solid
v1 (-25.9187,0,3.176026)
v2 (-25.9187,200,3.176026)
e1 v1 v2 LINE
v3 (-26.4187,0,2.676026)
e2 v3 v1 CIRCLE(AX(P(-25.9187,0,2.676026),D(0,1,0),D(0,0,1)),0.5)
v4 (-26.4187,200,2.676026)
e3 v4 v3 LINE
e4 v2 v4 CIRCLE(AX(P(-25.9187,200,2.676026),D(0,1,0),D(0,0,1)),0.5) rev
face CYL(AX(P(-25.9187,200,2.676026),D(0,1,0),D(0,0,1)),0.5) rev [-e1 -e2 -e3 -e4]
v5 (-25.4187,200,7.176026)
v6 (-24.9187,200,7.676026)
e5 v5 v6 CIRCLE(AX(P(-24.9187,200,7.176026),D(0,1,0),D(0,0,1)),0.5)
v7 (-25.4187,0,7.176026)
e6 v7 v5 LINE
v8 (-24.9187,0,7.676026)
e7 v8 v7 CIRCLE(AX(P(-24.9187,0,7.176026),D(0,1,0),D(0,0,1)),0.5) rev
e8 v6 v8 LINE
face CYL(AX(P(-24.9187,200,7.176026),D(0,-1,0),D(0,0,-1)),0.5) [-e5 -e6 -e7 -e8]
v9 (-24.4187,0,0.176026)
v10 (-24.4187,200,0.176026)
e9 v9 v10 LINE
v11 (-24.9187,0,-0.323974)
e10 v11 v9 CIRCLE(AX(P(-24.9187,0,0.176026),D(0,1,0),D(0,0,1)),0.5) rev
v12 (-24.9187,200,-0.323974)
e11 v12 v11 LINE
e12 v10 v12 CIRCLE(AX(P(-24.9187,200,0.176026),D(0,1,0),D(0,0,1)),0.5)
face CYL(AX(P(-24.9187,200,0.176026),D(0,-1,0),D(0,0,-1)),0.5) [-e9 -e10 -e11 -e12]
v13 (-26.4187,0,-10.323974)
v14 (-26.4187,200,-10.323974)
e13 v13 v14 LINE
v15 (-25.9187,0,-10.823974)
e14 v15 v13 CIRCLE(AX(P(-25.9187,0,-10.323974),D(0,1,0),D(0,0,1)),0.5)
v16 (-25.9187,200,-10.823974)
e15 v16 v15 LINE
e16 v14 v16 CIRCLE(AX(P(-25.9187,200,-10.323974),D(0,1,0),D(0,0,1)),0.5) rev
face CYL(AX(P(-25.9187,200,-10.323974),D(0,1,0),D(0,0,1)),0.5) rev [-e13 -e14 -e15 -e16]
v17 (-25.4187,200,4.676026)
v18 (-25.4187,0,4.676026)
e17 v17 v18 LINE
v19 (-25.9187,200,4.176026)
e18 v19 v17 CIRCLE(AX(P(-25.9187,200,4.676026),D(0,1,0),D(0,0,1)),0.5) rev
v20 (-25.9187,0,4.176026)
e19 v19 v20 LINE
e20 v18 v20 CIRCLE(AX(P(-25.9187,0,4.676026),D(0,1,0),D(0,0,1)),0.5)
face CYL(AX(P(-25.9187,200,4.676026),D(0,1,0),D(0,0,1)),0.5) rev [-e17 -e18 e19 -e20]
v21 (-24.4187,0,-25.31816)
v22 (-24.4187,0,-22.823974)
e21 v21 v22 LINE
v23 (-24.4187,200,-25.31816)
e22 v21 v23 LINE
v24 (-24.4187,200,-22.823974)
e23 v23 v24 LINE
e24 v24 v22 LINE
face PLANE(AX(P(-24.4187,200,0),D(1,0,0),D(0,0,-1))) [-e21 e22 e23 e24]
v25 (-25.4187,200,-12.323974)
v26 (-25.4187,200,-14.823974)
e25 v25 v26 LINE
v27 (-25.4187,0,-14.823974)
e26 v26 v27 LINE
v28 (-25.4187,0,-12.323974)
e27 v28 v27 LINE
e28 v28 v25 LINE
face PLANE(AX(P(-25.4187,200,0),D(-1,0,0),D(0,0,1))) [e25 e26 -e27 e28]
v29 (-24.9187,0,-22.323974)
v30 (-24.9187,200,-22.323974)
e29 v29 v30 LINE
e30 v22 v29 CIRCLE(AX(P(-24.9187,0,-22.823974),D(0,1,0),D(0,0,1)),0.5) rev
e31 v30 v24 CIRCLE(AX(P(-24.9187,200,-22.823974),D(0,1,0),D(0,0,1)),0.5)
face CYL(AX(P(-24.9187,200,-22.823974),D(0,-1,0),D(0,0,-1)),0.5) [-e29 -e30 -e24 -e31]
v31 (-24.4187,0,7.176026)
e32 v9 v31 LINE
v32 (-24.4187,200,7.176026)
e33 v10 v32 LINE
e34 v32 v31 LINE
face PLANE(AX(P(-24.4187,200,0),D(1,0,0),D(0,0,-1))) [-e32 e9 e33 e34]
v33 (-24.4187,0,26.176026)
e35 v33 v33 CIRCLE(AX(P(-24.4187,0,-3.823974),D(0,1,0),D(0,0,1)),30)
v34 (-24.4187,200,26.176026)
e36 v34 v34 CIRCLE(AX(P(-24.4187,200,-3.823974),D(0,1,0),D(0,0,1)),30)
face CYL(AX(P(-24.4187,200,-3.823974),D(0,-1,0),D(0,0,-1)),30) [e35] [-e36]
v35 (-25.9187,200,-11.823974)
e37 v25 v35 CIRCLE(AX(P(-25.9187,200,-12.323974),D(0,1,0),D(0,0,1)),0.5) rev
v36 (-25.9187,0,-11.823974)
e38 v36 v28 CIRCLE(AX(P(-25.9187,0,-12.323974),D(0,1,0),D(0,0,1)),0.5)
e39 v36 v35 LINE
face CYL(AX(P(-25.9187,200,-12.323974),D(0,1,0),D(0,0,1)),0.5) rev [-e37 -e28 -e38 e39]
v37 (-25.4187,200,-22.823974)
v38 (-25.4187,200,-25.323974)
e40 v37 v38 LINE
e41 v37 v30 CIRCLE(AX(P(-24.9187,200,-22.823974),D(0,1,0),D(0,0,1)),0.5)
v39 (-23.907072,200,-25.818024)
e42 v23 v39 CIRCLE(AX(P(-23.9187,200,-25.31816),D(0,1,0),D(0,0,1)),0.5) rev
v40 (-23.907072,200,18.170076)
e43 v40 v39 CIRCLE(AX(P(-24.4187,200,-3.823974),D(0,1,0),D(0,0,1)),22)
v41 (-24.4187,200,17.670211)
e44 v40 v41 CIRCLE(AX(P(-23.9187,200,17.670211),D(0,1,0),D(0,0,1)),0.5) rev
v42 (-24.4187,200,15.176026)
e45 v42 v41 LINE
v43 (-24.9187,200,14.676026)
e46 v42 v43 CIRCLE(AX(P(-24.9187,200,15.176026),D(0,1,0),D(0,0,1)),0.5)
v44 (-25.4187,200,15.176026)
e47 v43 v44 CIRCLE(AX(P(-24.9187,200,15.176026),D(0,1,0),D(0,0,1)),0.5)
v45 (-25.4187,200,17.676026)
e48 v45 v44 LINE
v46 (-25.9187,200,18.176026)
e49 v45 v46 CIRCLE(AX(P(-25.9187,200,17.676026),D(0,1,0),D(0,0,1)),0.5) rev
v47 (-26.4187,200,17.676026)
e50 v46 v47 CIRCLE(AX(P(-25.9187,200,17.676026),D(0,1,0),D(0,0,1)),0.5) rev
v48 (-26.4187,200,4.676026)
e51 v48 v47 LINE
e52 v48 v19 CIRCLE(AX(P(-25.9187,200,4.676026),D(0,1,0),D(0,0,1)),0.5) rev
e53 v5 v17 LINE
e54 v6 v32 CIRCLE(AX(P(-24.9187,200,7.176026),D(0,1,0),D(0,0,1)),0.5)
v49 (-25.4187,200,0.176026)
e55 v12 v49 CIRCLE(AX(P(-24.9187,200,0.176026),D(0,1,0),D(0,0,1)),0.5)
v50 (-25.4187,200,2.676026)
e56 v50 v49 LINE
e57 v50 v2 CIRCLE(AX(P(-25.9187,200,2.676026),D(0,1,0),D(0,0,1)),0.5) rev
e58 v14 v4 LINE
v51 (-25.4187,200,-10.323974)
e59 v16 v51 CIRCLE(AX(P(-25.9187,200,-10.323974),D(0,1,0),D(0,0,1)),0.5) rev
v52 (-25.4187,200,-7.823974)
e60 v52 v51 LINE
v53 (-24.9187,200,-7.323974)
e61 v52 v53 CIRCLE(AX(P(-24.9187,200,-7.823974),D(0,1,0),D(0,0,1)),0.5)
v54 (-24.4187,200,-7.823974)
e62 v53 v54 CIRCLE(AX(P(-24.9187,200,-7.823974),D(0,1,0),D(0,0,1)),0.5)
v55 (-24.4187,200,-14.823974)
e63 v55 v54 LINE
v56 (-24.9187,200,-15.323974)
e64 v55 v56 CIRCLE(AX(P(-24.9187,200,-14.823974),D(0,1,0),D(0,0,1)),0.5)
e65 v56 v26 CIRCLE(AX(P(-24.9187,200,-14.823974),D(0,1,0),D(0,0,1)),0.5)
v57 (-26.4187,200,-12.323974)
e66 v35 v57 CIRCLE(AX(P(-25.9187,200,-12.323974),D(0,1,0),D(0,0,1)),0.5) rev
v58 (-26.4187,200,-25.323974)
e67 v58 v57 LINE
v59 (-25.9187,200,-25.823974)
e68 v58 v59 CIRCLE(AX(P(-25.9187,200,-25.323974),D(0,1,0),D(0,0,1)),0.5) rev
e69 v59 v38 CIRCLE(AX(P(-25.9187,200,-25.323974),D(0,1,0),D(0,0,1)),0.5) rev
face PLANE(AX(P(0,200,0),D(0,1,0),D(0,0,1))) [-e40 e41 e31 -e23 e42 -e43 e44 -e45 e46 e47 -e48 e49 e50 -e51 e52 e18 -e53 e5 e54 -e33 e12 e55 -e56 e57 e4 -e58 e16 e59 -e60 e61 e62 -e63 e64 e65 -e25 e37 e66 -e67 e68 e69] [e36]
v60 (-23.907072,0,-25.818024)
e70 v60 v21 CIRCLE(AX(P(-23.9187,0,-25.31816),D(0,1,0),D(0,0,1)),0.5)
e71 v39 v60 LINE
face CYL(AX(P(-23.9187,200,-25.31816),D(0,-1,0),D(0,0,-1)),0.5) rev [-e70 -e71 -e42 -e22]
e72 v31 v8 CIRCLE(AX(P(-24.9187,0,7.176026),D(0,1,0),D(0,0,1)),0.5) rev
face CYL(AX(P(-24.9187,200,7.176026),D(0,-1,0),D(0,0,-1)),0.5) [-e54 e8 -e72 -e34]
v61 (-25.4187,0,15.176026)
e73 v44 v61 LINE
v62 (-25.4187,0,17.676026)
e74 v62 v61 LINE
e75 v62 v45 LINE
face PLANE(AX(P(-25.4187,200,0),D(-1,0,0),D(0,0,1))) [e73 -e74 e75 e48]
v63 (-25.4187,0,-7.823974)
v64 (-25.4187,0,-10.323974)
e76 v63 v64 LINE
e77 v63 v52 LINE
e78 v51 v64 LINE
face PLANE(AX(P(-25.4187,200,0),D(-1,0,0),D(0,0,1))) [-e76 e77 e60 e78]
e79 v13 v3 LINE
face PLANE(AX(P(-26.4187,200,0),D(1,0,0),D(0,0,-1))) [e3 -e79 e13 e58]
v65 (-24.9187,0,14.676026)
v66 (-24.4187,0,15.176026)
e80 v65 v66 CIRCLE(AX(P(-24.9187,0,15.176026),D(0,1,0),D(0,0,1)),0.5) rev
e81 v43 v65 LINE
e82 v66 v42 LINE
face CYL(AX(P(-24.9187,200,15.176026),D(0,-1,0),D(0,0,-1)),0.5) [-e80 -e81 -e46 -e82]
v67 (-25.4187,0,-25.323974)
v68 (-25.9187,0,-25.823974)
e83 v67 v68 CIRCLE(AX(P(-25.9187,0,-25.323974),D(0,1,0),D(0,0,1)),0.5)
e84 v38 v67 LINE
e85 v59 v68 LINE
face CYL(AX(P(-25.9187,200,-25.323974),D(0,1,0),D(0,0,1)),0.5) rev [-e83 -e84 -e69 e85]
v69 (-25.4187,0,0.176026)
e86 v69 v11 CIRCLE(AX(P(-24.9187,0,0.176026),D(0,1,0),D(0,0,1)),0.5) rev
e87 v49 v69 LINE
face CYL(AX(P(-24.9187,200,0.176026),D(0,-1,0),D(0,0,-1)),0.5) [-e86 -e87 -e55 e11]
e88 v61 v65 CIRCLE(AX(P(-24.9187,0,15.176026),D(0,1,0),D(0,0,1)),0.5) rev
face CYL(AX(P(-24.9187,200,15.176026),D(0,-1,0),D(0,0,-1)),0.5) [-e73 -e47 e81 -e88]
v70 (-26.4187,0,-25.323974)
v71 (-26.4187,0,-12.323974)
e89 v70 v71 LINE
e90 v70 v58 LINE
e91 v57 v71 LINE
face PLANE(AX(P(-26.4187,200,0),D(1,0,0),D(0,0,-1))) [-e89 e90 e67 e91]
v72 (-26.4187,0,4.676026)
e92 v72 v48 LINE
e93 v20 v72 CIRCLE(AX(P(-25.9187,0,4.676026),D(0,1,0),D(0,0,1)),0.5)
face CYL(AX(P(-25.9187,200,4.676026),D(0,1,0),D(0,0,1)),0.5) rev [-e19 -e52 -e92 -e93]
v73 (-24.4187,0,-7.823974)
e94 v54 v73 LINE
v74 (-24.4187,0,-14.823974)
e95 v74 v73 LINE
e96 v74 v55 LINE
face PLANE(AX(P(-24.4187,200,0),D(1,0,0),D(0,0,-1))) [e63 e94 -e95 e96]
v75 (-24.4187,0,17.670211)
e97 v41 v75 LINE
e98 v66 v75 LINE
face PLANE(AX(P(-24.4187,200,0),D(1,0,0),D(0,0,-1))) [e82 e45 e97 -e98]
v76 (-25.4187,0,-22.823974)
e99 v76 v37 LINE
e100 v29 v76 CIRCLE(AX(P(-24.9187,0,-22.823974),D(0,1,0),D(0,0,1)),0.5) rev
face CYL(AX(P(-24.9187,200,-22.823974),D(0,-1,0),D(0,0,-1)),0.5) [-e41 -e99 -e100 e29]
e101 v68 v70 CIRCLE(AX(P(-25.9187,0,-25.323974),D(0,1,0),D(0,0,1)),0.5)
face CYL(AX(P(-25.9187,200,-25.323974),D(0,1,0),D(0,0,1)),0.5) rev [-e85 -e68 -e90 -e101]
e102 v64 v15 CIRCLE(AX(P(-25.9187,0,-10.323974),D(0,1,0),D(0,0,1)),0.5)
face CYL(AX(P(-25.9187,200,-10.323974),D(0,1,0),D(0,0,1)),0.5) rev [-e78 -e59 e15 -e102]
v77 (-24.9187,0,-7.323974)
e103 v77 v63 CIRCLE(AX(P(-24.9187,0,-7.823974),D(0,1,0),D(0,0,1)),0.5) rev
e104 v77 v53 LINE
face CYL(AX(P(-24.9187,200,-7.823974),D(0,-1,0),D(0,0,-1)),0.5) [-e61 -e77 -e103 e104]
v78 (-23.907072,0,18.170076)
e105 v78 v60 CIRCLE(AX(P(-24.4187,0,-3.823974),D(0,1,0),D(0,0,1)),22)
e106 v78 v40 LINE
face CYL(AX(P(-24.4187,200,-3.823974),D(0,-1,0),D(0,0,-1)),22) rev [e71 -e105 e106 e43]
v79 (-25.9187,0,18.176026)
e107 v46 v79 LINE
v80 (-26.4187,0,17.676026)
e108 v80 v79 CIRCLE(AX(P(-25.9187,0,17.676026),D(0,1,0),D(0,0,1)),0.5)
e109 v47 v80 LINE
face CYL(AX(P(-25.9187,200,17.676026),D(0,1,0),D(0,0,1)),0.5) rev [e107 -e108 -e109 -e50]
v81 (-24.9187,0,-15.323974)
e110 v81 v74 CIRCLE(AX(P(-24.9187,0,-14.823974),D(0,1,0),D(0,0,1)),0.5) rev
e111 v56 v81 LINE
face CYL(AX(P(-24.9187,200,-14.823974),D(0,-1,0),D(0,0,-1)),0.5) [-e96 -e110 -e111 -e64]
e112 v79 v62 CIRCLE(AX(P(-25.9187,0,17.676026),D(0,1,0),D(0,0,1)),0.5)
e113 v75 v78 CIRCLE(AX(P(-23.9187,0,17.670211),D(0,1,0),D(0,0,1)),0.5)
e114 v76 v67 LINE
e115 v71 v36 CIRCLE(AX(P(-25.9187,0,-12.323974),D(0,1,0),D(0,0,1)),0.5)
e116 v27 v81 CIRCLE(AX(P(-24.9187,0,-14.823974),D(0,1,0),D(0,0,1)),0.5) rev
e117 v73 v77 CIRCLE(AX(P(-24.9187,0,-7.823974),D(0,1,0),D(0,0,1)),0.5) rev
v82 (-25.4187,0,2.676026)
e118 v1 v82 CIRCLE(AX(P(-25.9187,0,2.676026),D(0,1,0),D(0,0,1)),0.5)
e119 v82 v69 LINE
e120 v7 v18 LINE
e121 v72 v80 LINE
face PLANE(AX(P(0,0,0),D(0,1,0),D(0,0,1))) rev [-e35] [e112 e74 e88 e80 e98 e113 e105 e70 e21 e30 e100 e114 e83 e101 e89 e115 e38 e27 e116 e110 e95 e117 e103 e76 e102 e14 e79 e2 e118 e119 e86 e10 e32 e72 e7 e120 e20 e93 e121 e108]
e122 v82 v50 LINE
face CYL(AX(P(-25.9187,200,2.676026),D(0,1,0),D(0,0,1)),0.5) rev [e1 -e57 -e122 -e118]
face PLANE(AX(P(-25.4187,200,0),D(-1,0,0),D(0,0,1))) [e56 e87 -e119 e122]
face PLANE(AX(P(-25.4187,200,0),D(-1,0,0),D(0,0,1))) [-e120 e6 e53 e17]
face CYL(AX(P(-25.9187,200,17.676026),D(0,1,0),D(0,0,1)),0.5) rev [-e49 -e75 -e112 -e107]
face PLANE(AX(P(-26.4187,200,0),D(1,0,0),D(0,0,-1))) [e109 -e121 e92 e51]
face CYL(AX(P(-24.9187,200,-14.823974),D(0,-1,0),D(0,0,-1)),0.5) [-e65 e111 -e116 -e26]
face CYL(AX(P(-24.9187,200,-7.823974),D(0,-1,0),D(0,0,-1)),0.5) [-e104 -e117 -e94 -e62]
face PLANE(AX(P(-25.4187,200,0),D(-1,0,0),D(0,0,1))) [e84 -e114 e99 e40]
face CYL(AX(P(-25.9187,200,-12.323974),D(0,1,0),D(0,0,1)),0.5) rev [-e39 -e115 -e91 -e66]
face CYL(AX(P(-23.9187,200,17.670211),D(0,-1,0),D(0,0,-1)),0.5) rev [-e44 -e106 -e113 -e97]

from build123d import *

# Parameters (mm, degrees)
SKETCH1_R           = 30
BOSS_EXTRUDE2_DEPTH = 200
FILLET1_R           = 0.5


with BuildPart() as part:
    # Sketch1 → Boss-Extrude2 (new body)
    # profile 1 of 2: a face of its own
    with BuildSketch(Plane(origin=(0, 0, 0), x_dir=(1, 0, 0), z_dir=(0, 1, 0))):
        with Locations(Location((-24.418699654, 3.823974383, 0), (0, 0, 270))):
            Circle(SKETCH1_R)
        with BuildLine():
            Line((-26.418699654, -18.176025617), (-26.418699654, -4.176025617))
            Line((-26.418699654, -4.176025617), (-26.418699654, -3.176025617))
            Line((-26.418699654, -3.176025617), (-26.418699654, 10.823974383))
            Line((-26.418699654, 10.823974383), (-25.418699654, 10.823974383))
            Line((-25.418699654, 10.823974383), (-25.418699654, 7.323974383))
            Line((-25.418699654, 7.323974383), (-24.418699654, 7.323974383))
            Line((-24.418699654, 7.323974383), (-24.418699654, 10.823974383))
            Line((-24.418699654, 10.823974383), (-24.418699654, 11.823974383))
            Line((-24.418699654, 11.823974383), (-24.418699654, 15.323974383))
            Line((-24.418699654, 15.323974383), (-25.418699654, 15.323974383))
            Line((-25.418699654, 15.323974383), (-25.418699654, 11.823974383))
            Line((-25.418699654, 11.823974383), (-26.418699654, 11.823974383))
            Line((-26.418699654, 11.823974383), (-26.418699654, 25.823974383))
            Line((-26.418699654, 25.823974383), (-25.418699654, 25.823974383))
            Line((-25.418699654, 25.823974383), (-25.418699654, 22.323974383))
            Line((-25.418699654, 22.323974383), (-24.418699654, 22.323974383))
            Line((-24.418699654, 22.323974383), (-24.418699654, 25.823974383))
            ThreePointArc((-24.418699654, 25.823974383), (-2.418699654, 3.823974383), (-24.418699654, -18.176025617))
            Line((-24.418699654, -18.176025617), (-24.418699654, -14.676025617))
            Line((-24.418699654, -14.676025617), (-25.418699654, -14.676025617))
            Line((-25.418699654, -14.676025617), (-25.418699654, -18.176025617))
            Line((-25.418699654, -18.176025617), (-26.418699654, -18.176025617))
        make_face(mode=Mode.SUBTRACT)
    # profile 2 of 2: a face of its own
    with BuildSketch(Plane(origin=(0, 0, 0), x_dir=(1, 0, 0), z_dir=(0, 1, 0))):
        Polygon((-26.418699654, -3.176025617), (-26.418699654, -4.176025617), (-25.418699654, -4.176025617), (-25.418699654, -7.676025617), (-24.418699654, -7.676025617), (-24.418699654, -4.176025617), (-24.418699654, -3.176025617), (-24.418699654, 0.323974383), (-25.418699654, 0.323974383), (-25.418699654, -3.176025617), align=None)
    extrude(amount=BOSS_EXTRUDE2_DEPTH)

    # Fillet1
    fillet1_edges = [part.edges().sort_by_distance(p)[0] for p in [
        (-24.418699654, 100, -25.823974383),
        (-25.418699654, 100, 3.176025617),
        (-25.418699654, 100, -0.323974383),
        (-25.418699654, 100, -15.323974383),
        (-25.418699654, 100, -11.823974383),
        (-25.418699654, 100, -25.823974383),
        (-25.418699654, 100, -22.323974383),
        (-25.418699654, 100, -7.323974383),
        (-25.418699654, 100, -10.823974383),
        (-25.418699654, 100, 4.176025617),
        (-24.418699654, 100, -0.323974383),
        (-24.418699654, 100, -15.323974383),
        (-26.418699654, 100, -11.823974383),
        (-26.418699654, 100, 3.176025617),
        (-26.418699654, 100, -25.823974383),
        (-24.418699654, 100, -22.323974383),
        (-24.418699654, 100, -7.323974383),
        (-26.418699654, 100, -10.823974383),
        (-26.418699654, 100, 4.176025617),
        (-24.418699654, 100, 7.676025617),
        (-25.418699654, 100, 7.676025617),
        (-25.418699654, 100, 14.676025617),
        (-24.418699654, 100, 14.676025617),
        (-24.418699654, 100, 18.176025617),
        (-26.418699654, 100, 18.176025617),
        (-25.418699654, 100, 18.176025617),
    ]]
    fillet(fillet1_edges, radius=FILLET1_R - 0.0001)  # a hair under: the kernel refuses the full size


solid = part.part
